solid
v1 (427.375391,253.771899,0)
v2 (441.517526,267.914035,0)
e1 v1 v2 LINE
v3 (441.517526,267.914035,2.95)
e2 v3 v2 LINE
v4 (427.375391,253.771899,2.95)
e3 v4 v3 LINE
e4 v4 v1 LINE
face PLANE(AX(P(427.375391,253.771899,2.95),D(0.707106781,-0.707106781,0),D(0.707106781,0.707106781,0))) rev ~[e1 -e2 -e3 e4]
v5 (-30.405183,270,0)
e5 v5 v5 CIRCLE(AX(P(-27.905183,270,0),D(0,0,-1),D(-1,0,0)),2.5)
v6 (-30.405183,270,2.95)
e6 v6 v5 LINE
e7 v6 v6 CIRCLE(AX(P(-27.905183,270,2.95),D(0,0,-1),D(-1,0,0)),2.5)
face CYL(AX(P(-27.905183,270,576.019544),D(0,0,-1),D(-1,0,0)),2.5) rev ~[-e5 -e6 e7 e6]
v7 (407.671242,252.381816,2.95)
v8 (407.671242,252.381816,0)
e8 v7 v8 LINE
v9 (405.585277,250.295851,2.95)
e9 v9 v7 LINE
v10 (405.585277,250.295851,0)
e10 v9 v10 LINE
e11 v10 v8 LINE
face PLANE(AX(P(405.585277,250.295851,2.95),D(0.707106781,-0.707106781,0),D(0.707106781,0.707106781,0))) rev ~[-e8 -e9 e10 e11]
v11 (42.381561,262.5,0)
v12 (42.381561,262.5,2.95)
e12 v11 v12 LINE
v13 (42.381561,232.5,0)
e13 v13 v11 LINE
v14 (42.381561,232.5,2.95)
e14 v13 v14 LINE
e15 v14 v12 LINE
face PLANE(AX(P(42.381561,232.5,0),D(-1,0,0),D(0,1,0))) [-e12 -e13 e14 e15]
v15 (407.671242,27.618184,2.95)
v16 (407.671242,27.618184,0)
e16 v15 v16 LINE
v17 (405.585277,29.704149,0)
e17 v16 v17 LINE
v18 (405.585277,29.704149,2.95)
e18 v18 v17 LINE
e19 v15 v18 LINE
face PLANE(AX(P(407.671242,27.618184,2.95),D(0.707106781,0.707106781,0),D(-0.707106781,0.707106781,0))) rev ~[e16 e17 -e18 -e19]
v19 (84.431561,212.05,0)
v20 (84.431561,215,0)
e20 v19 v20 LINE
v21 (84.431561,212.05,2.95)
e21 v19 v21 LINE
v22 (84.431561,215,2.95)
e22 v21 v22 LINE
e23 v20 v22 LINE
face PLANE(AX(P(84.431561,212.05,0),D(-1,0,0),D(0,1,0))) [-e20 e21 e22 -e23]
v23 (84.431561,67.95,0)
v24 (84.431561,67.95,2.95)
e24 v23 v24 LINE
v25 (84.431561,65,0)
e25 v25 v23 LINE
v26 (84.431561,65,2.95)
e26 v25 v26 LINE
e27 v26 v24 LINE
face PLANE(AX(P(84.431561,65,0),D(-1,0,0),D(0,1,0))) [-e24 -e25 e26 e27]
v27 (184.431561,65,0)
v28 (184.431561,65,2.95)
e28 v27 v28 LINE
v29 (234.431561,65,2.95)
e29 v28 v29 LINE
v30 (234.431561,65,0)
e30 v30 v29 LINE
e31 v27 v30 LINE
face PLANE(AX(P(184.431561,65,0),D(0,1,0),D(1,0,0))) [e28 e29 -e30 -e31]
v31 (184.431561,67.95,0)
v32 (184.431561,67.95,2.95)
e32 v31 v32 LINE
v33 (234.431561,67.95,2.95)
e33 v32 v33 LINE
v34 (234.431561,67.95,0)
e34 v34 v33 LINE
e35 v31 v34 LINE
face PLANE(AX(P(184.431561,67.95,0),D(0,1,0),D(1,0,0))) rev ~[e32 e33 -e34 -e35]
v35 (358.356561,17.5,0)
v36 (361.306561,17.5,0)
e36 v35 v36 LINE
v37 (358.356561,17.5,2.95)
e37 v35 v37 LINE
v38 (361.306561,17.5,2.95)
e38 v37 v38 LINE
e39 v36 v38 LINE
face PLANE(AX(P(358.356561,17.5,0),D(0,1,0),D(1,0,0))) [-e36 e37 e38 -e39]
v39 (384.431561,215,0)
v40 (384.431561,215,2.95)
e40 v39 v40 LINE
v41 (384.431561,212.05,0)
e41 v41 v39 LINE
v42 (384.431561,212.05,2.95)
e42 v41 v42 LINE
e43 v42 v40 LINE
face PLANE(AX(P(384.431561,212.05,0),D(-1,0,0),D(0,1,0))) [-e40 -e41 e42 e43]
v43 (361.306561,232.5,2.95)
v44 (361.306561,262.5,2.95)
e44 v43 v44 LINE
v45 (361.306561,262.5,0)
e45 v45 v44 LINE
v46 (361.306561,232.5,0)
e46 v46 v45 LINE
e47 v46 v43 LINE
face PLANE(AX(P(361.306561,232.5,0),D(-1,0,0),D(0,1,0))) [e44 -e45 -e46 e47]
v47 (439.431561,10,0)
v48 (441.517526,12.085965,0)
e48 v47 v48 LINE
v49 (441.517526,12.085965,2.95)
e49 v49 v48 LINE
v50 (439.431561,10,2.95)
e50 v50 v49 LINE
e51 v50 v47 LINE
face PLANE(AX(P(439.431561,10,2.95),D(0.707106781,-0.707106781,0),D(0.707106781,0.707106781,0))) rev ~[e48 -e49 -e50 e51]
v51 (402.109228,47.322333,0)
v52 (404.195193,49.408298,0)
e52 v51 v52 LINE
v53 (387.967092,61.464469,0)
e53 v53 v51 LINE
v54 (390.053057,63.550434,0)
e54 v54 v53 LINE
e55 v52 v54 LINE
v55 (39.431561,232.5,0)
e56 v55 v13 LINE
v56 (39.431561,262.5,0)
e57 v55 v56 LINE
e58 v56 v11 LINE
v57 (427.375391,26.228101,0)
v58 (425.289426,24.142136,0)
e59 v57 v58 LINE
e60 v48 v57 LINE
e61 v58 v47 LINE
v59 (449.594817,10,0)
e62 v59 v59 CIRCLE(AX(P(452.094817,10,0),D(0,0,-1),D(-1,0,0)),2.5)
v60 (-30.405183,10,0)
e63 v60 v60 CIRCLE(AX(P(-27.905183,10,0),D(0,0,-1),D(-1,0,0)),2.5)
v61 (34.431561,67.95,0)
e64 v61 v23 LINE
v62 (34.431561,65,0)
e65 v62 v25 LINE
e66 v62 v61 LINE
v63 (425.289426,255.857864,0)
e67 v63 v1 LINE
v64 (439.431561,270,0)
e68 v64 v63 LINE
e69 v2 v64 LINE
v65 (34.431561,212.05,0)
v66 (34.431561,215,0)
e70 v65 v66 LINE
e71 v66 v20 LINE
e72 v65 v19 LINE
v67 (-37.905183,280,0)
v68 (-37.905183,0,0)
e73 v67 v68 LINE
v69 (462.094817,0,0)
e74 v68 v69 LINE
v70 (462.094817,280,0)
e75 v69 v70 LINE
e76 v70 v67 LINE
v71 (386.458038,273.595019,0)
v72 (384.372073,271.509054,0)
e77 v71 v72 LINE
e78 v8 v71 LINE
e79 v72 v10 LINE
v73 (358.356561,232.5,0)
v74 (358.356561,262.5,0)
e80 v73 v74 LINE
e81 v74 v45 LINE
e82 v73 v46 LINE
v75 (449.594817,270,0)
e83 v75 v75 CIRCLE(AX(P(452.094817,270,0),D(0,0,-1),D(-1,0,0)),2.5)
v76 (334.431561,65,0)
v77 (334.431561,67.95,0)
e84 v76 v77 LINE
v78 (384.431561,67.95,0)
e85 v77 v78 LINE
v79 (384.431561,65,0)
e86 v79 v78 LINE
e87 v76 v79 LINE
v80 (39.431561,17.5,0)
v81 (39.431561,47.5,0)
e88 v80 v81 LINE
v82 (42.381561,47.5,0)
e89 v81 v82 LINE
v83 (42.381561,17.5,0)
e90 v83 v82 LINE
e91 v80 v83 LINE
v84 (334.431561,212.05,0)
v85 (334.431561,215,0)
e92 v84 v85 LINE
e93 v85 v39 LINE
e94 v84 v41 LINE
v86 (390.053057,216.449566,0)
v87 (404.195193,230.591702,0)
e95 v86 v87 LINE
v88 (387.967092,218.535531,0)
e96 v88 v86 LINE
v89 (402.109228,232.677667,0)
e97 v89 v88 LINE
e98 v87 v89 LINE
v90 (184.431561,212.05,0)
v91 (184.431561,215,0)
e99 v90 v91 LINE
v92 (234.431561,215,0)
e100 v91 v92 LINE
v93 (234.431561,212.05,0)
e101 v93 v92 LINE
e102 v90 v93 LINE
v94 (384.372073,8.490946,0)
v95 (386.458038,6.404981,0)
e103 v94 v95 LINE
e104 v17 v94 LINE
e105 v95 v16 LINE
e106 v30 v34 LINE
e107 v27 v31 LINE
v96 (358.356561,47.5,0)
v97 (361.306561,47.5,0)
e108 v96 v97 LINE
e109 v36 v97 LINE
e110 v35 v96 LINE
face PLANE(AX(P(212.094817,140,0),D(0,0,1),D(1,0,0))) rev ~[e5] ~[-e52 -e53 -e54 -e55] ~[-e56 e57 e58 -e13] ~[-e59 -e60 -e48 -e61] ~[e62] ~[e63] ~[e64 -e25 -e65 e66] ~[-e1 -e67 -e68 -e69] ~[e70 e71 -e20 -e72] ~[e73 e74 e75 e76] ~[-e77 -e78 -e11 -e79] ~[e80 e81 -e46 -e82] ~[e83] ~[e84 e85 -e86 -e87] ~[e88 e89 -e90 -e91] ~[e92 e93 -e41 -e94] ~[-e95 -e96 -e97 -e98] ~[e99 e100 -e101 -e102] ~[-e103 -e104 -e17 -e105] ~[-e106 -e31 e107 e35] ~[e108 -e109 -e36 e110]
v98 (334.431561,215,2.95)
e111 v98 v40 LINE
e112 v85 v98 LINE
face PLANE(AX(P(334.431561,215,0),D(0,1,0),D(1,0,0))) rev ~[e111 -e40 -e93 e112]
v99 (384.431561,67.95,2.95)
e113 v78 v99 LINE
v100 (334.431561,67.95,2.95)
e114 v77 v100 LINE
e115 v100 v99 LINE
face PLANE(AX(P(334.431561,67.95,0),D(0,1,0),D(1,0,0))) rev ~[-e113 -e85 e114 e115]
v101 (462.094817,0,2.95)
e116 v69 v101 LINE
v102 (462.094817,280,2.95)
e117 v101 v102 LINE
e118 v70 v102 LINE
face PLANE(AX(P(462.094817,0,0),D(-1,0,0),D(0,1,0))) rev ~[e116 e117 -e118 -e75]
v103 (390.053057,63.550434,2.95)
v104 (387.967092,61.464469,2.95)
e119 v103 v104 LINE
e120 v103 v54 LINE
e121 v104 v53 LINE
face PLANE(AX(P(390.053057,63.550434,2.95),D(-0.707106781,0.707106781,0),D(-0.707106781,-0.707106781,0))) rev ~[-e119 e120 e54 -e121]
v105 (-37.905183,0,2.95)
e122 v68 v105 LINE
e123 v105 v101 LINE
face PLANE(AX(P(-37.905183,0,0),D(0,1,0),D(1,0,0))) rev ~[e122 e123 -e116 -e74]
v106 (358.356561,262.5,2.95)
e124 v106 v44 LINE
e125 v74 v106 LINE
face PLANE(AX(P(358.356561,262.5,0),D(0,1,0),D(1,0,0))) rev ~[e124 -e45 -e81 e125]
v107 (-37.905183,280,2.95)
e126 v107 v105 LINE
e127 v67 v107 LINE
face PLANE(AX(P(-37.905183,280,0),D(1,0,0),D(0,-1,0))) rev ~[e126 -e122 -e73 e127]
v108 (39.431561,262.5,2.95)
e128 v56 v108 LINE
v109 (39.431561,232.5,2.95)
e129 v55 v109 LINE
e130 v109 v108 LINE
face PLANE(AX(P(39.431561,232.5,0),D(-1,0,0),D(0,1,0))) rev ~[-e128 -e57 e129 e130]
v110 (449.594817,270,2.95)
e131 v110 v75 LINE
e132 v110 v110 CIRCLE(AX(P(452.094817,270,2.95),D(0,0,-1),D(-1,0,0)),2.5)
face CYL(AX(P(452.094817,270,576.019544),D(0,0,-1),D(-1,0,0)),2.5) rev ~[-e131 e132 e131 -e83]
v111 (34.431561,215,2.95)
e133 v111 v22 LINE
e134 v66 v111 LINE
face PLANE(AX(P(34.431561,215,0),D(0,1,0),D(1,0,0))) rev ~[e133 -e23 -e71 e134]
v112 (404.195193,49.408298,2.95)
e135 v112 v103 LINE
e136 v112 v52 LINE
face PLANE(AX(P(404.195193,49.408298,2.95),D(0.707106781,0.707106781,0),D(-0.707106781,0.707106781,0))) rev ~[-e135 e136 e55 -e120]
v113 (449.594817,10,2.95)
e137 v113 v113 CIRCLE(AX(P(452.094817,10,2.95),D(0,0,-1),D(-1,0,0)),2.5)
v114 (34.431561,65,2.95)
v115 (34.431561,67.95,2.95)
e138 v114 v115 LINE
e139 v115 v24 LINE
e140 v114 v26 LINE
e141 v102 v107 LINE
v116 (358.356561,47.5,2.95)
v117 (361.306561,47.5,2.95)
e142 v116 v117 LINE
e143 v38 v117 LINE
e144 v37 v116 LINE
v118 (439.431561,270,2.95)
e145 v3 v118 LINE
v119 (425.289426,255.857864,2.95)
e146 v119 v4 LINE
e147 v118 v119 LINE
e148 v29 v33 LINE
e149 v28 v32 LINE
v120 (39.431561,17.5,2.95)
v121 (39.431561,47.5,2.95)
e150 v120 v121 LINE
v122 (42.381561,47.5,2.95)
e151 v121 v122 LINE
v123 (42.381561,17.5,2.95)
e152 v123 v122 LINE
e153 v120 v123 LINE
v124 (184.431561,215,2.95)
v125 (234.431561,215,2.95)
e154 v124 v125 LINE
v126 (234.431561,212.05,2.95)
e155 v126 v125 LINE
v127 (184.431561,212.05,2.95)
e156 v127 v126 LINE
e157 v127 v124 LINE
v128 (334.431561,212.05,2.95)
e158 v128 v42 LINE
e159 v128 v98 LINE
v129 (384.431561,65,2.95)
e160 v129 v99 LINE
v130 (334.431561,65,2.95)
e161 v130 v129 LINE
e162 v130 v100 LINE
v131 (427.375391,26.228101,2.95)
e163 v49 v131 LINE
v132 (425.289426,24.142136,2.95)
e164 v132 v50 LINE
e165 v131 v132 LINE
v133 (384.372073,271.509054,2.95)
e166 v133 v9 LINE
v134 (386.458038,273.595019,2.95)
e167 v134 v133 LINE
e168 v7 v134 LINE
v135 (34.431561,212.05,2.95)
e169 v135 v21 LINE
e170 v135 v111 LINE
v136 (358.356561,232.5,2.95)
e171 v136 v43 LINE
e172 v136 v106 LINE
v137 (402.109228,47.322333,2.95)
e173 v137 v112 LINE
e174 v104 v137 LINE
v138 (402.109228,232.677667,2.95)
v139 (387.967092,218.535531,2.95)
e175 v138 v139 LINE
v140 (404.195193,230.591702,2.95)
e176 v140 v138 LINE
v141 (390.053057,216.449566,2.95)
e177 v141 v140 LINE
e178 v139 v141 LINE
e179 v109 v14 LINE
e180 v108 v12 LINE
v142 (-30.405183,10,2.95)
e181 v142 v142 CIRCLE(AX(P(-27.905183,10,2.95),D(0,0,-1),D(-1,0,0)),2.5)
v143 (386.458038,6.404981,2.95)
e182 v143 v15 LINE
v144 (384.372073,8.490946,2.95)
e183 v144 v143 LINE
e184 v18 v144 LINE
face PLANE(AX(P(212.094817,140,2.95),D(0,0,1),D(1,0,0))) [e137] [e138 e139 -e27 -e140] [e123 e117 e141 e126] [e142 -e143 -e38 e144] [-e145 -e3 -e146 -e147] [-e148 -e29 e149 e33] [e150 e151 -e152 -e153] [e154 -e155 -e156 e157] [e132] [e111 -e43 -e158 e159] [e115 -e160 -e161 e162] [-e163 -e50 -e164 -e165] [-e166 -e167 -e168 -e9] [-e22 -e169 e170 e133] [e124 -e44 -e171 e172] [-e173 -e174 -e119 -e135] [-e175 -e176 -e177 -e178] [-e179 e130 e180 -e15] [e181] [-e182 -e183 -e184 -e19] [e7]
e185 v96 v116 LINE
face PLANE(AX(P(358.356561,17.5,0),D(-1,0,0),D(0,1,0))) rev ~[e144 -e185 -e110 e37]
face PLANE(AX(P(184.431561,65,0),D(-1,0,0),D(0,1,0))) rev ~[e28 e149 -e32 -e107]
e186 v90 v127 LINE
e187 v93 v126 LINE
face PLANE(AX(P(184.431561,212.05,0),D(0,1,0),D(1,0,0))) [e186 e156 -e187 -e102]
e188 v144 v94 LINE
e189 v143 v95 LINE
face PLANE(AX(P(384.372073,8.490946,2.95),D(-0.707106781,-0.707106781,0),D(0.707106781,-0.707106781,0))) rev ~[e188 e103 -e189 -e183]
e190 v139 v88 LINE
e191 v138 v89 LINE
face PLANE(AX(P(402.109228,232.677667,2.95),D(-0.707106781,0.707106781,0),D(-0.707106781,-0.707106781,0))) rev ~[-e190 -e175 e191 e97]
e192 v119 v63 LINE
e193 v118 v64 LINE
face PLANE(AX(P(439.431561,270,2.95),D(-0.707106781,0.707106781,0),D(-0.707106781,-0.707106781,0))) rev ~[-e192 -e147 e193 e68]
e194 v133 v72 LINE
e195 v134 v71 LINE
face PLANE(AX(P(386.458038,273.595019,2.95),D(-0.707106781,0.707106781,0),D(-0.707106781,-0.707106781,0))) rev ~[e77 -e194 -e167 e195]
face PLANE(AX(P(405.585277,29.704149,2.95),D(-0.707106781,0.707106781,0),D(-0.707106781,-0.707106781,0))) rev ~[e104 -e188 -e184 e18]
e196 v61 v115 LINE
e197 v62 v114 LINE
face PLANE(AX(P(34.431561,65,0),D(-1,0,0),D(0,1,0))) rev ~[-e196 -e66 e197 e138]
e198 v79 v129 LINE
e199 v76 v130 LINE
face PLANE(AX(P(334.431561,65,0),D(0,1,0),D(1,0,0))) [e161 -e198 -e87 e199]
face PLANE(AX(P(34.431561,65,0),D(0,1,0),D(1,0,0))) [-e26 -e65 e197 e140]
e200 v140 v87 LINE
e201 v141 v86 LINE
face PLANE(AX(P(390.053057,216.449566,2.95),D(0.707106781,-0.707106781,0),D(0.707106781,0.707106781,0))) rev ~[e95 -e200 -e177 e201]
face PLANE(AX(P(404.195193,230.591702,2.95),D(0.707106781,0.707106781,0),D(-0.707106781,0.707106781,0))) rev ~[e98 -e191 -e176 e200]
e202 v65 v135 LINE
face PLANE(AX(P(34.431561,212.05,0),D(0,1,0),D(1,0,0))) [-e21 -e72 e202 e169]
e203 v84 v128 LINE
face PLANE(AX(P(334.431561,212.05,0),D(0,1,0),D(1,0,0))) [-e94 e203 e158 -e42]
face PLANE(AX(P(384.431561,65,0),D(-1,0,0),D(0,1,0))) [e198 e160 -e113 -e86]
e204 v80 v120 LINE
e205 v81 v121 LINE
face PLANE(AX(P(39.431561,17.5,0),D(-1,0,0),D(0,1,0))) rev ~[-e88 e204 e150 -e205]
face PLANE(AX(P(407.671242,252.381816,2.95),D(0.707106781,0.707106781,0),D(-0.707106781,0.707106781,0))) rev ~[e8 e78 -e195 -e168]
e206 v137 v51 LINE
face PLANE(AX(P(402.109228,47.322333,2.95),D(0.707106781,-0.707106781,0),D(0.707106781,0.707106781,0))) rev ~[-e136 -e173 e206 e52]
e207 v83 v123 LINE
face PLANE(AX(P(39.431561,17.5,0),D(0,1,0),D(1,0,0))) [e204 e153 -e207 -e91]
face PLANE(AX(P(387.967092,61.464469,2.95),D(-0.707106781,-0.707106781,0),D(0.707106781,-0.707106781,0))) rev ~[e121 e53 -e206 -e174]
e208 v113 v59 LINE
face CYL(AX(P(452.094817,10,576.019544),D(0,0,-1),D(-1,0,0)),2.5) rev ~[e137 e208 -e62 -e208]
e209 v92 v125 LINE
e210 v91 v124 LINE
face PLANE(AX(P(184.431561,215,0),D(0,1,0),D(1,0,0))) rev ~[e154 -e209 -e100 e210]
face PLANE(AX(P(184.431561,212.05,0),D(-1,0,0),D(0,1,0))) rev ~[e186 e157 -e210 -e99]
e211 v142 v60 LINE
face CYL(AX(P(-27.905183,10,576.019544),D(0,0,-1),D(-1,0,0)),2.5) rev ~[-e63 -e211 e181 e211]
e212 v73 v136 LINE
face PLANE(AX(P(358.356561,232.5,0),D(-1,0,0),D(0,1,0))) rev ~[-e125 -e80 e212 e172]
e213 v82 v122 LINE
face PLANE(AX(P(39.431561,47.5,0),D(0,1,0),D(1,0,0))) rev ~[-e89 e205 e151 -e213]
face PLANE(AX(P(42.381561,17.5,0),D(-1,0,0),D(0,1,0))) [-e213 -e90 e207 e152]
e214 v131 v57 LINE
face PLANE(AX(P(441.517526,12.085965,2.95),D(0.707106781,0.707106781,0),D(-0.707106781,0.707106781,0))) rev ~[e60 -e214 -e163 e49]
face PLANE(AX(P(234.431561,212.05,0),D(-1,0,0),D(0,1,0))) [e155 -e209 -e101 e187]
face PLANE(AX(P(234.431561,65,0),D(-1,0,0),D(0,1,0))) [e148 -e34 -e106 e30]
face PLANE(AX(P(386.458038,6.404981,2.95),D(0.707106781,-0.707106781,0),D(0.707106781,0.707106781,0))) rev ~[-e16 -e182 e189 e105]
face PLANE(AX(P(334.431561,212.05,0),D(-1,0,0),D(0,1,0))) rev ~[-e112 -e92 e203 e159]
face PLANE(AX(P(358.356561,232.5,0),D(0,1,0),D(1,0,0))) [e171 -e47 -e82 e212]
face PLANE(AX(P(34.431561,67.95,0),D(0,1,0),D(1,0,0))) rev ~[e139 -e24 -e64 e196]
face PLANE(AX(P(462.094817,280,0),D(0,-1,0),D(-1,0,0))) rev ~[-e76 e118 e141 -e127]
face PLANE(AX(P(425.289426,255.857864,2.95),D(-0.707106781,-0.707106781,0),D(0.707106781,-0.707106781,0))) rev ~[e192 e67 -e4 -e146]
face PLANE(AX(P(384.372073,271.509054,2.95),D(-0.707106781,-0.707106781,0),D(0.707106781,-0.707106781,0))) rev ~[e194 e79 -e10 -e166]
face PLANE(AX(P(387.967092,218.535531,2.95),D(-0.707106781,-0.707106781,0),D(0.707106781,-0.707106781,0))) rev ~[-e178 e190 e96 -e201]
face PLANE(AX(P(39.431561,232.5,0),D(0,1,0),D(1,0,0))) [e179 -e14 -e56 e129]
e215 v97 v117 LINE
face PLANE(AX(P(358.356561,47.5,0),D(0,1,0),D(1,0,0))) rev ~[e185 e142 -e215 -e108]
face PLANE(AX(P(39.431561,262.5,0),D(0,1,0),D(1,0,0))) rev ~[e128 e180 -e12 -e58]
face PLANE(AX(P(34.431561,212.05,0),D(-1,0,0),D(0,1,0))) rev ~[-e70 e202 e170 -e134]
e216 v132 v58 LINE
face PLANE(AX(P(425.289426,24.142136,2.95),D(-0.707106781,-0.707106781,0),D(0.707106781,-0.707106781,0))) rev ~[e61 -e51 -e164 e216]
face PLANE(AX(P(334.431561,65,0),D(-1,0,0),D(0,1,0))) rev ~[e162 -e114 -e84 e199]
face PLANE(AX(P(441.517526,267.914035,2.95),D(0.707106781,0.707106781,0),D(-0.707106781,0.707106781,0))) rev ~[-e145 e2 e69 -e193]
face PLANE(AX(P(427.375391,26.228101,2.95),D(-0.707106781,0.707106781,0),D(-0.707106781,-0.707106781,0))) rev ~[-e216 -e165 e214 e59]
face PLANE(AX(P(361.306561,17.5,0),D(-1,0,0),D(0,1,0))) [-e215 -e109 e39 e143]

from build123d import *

# Parameters (mm, degrees)
F0_W     = 2.95
F0_H     = 30
F0_W_2   = 50
F0_H_2   = 2.95
F1_DEPTH = 2.95
F3_D     = 5
F5_DEPTH = 2.95


# Not quite as in the source:
# - a feature names something its author has since deleted; it is built from what else it names


with BuildPart() as f1:
    # F0 (on Top) → F1 (new body)
    with BuildSketch(Plane.XY):
        Polygon((-37.9051826894, 0), (12.0948173106, 0), (462.0948173106, 0), (462.0948173106, 280), (62.0948173106, 280), (-37.9051826894, 280), align=None)
        with Locations((40.9065613726, 32.5)):
            Rectangle(F0_W, F0_H, mode=Mode.SUBTRACT)
        with Locations((59.4315613726, 66.475)):
            Rectangle(F0_W_2, F0_H_2, mode=Mode.SUBTRACT)
        with Locations((209.4315613726, 66.475)):
            Rectangle(F0_W_2, F0_H_2, mode=Mode.SUBTRACT)
        with Locations((359.8315613726, 32.5)):
            Rectangle(F0_W, F0_H, mode=Mode.SUBTRACT)
        with Locations((359.4315613726, 66.475)):
            Rectangle(F0_W_2, F0_H_2, mode=Mode.SUBTRACT)
        with Locations((59.4315613726, 213.525)):
            Rectangle(F0_W_2, F0_H_2, mode=Mode.SUBTRACT)
        with Locations((40.9065613726, 247.5)):
            Rectangle(F0_W, F0_H, mode=Mode.SUBTRACT)
        with Locations((209.4315613726, 213.525)):
            Rectangle(F0_W_2, F0_H_2, mode=Mode.SUBTRACT)
        with Locations((359.4315613726, 213.525)):
            Rectangle(F0_W_2, F0_H_2, mode=Mode.SUBTRACT)
        with Locations((359.8315613726, 247.5)):
            Rectangle(F0_W, F0_H, mode=Mode.SUBTRACT)
    extrude(amount=F1_DEPTH)

    # F3 (through all)
    with Locations(Plane.XY.offset(2.95)):
        with Locations((-27.9051826894, 10), (-27.9051826894, 270), (452.0948173106, 10), (452.0948173106, 270)):
            Hole(F3_D / 2)

    # F4 (on face) → F5 (cut)
    with BuildSketch(Plane.XY.offset(2.95)):
        Polygon((402.1092280247, 232.6776666521), (387.9670924009, 218.5355310284), (390.0530574054, 216.4495660239), (404.1951930292, 230.5917016476), align=None)
        Polygon((441.5175263771, 267.9140349955), (439.4315613726, 270), (425.2894257488, 255.8578643763), (427.3753907533, 253.7718993718), align=None)
        Polygon((386.4580381415, 273.5950192639), (384.372073137, 271.5090542594), (405.5852765726, 250.2958508238), (407.6712415771, 252.3818158283), align=None)
        Polygon((386.4580381415, 6.4049807361), (407.6712415771, 27.6181841717), (405.5852765726, 29.7041491762), (384.372073137, 8.4909457406), align=None)
        Polygon((427.3753907533, 26.2281006282), (425.2894257488, 24.1421356237), (439.4315613726, 10), (441.5175263771, 12.0859650045), align=None)
        Polygon((387.9670924009, 61.4644689716), (402.1092280247, 47.3223333479), (404.1951930292, 49.4082983524), (390.0530574054, 63.5504339761), align=None)
    extrude(amount=-F5_DEPTH, mode=Mode.SUBTRACT)


solid = f1.part
